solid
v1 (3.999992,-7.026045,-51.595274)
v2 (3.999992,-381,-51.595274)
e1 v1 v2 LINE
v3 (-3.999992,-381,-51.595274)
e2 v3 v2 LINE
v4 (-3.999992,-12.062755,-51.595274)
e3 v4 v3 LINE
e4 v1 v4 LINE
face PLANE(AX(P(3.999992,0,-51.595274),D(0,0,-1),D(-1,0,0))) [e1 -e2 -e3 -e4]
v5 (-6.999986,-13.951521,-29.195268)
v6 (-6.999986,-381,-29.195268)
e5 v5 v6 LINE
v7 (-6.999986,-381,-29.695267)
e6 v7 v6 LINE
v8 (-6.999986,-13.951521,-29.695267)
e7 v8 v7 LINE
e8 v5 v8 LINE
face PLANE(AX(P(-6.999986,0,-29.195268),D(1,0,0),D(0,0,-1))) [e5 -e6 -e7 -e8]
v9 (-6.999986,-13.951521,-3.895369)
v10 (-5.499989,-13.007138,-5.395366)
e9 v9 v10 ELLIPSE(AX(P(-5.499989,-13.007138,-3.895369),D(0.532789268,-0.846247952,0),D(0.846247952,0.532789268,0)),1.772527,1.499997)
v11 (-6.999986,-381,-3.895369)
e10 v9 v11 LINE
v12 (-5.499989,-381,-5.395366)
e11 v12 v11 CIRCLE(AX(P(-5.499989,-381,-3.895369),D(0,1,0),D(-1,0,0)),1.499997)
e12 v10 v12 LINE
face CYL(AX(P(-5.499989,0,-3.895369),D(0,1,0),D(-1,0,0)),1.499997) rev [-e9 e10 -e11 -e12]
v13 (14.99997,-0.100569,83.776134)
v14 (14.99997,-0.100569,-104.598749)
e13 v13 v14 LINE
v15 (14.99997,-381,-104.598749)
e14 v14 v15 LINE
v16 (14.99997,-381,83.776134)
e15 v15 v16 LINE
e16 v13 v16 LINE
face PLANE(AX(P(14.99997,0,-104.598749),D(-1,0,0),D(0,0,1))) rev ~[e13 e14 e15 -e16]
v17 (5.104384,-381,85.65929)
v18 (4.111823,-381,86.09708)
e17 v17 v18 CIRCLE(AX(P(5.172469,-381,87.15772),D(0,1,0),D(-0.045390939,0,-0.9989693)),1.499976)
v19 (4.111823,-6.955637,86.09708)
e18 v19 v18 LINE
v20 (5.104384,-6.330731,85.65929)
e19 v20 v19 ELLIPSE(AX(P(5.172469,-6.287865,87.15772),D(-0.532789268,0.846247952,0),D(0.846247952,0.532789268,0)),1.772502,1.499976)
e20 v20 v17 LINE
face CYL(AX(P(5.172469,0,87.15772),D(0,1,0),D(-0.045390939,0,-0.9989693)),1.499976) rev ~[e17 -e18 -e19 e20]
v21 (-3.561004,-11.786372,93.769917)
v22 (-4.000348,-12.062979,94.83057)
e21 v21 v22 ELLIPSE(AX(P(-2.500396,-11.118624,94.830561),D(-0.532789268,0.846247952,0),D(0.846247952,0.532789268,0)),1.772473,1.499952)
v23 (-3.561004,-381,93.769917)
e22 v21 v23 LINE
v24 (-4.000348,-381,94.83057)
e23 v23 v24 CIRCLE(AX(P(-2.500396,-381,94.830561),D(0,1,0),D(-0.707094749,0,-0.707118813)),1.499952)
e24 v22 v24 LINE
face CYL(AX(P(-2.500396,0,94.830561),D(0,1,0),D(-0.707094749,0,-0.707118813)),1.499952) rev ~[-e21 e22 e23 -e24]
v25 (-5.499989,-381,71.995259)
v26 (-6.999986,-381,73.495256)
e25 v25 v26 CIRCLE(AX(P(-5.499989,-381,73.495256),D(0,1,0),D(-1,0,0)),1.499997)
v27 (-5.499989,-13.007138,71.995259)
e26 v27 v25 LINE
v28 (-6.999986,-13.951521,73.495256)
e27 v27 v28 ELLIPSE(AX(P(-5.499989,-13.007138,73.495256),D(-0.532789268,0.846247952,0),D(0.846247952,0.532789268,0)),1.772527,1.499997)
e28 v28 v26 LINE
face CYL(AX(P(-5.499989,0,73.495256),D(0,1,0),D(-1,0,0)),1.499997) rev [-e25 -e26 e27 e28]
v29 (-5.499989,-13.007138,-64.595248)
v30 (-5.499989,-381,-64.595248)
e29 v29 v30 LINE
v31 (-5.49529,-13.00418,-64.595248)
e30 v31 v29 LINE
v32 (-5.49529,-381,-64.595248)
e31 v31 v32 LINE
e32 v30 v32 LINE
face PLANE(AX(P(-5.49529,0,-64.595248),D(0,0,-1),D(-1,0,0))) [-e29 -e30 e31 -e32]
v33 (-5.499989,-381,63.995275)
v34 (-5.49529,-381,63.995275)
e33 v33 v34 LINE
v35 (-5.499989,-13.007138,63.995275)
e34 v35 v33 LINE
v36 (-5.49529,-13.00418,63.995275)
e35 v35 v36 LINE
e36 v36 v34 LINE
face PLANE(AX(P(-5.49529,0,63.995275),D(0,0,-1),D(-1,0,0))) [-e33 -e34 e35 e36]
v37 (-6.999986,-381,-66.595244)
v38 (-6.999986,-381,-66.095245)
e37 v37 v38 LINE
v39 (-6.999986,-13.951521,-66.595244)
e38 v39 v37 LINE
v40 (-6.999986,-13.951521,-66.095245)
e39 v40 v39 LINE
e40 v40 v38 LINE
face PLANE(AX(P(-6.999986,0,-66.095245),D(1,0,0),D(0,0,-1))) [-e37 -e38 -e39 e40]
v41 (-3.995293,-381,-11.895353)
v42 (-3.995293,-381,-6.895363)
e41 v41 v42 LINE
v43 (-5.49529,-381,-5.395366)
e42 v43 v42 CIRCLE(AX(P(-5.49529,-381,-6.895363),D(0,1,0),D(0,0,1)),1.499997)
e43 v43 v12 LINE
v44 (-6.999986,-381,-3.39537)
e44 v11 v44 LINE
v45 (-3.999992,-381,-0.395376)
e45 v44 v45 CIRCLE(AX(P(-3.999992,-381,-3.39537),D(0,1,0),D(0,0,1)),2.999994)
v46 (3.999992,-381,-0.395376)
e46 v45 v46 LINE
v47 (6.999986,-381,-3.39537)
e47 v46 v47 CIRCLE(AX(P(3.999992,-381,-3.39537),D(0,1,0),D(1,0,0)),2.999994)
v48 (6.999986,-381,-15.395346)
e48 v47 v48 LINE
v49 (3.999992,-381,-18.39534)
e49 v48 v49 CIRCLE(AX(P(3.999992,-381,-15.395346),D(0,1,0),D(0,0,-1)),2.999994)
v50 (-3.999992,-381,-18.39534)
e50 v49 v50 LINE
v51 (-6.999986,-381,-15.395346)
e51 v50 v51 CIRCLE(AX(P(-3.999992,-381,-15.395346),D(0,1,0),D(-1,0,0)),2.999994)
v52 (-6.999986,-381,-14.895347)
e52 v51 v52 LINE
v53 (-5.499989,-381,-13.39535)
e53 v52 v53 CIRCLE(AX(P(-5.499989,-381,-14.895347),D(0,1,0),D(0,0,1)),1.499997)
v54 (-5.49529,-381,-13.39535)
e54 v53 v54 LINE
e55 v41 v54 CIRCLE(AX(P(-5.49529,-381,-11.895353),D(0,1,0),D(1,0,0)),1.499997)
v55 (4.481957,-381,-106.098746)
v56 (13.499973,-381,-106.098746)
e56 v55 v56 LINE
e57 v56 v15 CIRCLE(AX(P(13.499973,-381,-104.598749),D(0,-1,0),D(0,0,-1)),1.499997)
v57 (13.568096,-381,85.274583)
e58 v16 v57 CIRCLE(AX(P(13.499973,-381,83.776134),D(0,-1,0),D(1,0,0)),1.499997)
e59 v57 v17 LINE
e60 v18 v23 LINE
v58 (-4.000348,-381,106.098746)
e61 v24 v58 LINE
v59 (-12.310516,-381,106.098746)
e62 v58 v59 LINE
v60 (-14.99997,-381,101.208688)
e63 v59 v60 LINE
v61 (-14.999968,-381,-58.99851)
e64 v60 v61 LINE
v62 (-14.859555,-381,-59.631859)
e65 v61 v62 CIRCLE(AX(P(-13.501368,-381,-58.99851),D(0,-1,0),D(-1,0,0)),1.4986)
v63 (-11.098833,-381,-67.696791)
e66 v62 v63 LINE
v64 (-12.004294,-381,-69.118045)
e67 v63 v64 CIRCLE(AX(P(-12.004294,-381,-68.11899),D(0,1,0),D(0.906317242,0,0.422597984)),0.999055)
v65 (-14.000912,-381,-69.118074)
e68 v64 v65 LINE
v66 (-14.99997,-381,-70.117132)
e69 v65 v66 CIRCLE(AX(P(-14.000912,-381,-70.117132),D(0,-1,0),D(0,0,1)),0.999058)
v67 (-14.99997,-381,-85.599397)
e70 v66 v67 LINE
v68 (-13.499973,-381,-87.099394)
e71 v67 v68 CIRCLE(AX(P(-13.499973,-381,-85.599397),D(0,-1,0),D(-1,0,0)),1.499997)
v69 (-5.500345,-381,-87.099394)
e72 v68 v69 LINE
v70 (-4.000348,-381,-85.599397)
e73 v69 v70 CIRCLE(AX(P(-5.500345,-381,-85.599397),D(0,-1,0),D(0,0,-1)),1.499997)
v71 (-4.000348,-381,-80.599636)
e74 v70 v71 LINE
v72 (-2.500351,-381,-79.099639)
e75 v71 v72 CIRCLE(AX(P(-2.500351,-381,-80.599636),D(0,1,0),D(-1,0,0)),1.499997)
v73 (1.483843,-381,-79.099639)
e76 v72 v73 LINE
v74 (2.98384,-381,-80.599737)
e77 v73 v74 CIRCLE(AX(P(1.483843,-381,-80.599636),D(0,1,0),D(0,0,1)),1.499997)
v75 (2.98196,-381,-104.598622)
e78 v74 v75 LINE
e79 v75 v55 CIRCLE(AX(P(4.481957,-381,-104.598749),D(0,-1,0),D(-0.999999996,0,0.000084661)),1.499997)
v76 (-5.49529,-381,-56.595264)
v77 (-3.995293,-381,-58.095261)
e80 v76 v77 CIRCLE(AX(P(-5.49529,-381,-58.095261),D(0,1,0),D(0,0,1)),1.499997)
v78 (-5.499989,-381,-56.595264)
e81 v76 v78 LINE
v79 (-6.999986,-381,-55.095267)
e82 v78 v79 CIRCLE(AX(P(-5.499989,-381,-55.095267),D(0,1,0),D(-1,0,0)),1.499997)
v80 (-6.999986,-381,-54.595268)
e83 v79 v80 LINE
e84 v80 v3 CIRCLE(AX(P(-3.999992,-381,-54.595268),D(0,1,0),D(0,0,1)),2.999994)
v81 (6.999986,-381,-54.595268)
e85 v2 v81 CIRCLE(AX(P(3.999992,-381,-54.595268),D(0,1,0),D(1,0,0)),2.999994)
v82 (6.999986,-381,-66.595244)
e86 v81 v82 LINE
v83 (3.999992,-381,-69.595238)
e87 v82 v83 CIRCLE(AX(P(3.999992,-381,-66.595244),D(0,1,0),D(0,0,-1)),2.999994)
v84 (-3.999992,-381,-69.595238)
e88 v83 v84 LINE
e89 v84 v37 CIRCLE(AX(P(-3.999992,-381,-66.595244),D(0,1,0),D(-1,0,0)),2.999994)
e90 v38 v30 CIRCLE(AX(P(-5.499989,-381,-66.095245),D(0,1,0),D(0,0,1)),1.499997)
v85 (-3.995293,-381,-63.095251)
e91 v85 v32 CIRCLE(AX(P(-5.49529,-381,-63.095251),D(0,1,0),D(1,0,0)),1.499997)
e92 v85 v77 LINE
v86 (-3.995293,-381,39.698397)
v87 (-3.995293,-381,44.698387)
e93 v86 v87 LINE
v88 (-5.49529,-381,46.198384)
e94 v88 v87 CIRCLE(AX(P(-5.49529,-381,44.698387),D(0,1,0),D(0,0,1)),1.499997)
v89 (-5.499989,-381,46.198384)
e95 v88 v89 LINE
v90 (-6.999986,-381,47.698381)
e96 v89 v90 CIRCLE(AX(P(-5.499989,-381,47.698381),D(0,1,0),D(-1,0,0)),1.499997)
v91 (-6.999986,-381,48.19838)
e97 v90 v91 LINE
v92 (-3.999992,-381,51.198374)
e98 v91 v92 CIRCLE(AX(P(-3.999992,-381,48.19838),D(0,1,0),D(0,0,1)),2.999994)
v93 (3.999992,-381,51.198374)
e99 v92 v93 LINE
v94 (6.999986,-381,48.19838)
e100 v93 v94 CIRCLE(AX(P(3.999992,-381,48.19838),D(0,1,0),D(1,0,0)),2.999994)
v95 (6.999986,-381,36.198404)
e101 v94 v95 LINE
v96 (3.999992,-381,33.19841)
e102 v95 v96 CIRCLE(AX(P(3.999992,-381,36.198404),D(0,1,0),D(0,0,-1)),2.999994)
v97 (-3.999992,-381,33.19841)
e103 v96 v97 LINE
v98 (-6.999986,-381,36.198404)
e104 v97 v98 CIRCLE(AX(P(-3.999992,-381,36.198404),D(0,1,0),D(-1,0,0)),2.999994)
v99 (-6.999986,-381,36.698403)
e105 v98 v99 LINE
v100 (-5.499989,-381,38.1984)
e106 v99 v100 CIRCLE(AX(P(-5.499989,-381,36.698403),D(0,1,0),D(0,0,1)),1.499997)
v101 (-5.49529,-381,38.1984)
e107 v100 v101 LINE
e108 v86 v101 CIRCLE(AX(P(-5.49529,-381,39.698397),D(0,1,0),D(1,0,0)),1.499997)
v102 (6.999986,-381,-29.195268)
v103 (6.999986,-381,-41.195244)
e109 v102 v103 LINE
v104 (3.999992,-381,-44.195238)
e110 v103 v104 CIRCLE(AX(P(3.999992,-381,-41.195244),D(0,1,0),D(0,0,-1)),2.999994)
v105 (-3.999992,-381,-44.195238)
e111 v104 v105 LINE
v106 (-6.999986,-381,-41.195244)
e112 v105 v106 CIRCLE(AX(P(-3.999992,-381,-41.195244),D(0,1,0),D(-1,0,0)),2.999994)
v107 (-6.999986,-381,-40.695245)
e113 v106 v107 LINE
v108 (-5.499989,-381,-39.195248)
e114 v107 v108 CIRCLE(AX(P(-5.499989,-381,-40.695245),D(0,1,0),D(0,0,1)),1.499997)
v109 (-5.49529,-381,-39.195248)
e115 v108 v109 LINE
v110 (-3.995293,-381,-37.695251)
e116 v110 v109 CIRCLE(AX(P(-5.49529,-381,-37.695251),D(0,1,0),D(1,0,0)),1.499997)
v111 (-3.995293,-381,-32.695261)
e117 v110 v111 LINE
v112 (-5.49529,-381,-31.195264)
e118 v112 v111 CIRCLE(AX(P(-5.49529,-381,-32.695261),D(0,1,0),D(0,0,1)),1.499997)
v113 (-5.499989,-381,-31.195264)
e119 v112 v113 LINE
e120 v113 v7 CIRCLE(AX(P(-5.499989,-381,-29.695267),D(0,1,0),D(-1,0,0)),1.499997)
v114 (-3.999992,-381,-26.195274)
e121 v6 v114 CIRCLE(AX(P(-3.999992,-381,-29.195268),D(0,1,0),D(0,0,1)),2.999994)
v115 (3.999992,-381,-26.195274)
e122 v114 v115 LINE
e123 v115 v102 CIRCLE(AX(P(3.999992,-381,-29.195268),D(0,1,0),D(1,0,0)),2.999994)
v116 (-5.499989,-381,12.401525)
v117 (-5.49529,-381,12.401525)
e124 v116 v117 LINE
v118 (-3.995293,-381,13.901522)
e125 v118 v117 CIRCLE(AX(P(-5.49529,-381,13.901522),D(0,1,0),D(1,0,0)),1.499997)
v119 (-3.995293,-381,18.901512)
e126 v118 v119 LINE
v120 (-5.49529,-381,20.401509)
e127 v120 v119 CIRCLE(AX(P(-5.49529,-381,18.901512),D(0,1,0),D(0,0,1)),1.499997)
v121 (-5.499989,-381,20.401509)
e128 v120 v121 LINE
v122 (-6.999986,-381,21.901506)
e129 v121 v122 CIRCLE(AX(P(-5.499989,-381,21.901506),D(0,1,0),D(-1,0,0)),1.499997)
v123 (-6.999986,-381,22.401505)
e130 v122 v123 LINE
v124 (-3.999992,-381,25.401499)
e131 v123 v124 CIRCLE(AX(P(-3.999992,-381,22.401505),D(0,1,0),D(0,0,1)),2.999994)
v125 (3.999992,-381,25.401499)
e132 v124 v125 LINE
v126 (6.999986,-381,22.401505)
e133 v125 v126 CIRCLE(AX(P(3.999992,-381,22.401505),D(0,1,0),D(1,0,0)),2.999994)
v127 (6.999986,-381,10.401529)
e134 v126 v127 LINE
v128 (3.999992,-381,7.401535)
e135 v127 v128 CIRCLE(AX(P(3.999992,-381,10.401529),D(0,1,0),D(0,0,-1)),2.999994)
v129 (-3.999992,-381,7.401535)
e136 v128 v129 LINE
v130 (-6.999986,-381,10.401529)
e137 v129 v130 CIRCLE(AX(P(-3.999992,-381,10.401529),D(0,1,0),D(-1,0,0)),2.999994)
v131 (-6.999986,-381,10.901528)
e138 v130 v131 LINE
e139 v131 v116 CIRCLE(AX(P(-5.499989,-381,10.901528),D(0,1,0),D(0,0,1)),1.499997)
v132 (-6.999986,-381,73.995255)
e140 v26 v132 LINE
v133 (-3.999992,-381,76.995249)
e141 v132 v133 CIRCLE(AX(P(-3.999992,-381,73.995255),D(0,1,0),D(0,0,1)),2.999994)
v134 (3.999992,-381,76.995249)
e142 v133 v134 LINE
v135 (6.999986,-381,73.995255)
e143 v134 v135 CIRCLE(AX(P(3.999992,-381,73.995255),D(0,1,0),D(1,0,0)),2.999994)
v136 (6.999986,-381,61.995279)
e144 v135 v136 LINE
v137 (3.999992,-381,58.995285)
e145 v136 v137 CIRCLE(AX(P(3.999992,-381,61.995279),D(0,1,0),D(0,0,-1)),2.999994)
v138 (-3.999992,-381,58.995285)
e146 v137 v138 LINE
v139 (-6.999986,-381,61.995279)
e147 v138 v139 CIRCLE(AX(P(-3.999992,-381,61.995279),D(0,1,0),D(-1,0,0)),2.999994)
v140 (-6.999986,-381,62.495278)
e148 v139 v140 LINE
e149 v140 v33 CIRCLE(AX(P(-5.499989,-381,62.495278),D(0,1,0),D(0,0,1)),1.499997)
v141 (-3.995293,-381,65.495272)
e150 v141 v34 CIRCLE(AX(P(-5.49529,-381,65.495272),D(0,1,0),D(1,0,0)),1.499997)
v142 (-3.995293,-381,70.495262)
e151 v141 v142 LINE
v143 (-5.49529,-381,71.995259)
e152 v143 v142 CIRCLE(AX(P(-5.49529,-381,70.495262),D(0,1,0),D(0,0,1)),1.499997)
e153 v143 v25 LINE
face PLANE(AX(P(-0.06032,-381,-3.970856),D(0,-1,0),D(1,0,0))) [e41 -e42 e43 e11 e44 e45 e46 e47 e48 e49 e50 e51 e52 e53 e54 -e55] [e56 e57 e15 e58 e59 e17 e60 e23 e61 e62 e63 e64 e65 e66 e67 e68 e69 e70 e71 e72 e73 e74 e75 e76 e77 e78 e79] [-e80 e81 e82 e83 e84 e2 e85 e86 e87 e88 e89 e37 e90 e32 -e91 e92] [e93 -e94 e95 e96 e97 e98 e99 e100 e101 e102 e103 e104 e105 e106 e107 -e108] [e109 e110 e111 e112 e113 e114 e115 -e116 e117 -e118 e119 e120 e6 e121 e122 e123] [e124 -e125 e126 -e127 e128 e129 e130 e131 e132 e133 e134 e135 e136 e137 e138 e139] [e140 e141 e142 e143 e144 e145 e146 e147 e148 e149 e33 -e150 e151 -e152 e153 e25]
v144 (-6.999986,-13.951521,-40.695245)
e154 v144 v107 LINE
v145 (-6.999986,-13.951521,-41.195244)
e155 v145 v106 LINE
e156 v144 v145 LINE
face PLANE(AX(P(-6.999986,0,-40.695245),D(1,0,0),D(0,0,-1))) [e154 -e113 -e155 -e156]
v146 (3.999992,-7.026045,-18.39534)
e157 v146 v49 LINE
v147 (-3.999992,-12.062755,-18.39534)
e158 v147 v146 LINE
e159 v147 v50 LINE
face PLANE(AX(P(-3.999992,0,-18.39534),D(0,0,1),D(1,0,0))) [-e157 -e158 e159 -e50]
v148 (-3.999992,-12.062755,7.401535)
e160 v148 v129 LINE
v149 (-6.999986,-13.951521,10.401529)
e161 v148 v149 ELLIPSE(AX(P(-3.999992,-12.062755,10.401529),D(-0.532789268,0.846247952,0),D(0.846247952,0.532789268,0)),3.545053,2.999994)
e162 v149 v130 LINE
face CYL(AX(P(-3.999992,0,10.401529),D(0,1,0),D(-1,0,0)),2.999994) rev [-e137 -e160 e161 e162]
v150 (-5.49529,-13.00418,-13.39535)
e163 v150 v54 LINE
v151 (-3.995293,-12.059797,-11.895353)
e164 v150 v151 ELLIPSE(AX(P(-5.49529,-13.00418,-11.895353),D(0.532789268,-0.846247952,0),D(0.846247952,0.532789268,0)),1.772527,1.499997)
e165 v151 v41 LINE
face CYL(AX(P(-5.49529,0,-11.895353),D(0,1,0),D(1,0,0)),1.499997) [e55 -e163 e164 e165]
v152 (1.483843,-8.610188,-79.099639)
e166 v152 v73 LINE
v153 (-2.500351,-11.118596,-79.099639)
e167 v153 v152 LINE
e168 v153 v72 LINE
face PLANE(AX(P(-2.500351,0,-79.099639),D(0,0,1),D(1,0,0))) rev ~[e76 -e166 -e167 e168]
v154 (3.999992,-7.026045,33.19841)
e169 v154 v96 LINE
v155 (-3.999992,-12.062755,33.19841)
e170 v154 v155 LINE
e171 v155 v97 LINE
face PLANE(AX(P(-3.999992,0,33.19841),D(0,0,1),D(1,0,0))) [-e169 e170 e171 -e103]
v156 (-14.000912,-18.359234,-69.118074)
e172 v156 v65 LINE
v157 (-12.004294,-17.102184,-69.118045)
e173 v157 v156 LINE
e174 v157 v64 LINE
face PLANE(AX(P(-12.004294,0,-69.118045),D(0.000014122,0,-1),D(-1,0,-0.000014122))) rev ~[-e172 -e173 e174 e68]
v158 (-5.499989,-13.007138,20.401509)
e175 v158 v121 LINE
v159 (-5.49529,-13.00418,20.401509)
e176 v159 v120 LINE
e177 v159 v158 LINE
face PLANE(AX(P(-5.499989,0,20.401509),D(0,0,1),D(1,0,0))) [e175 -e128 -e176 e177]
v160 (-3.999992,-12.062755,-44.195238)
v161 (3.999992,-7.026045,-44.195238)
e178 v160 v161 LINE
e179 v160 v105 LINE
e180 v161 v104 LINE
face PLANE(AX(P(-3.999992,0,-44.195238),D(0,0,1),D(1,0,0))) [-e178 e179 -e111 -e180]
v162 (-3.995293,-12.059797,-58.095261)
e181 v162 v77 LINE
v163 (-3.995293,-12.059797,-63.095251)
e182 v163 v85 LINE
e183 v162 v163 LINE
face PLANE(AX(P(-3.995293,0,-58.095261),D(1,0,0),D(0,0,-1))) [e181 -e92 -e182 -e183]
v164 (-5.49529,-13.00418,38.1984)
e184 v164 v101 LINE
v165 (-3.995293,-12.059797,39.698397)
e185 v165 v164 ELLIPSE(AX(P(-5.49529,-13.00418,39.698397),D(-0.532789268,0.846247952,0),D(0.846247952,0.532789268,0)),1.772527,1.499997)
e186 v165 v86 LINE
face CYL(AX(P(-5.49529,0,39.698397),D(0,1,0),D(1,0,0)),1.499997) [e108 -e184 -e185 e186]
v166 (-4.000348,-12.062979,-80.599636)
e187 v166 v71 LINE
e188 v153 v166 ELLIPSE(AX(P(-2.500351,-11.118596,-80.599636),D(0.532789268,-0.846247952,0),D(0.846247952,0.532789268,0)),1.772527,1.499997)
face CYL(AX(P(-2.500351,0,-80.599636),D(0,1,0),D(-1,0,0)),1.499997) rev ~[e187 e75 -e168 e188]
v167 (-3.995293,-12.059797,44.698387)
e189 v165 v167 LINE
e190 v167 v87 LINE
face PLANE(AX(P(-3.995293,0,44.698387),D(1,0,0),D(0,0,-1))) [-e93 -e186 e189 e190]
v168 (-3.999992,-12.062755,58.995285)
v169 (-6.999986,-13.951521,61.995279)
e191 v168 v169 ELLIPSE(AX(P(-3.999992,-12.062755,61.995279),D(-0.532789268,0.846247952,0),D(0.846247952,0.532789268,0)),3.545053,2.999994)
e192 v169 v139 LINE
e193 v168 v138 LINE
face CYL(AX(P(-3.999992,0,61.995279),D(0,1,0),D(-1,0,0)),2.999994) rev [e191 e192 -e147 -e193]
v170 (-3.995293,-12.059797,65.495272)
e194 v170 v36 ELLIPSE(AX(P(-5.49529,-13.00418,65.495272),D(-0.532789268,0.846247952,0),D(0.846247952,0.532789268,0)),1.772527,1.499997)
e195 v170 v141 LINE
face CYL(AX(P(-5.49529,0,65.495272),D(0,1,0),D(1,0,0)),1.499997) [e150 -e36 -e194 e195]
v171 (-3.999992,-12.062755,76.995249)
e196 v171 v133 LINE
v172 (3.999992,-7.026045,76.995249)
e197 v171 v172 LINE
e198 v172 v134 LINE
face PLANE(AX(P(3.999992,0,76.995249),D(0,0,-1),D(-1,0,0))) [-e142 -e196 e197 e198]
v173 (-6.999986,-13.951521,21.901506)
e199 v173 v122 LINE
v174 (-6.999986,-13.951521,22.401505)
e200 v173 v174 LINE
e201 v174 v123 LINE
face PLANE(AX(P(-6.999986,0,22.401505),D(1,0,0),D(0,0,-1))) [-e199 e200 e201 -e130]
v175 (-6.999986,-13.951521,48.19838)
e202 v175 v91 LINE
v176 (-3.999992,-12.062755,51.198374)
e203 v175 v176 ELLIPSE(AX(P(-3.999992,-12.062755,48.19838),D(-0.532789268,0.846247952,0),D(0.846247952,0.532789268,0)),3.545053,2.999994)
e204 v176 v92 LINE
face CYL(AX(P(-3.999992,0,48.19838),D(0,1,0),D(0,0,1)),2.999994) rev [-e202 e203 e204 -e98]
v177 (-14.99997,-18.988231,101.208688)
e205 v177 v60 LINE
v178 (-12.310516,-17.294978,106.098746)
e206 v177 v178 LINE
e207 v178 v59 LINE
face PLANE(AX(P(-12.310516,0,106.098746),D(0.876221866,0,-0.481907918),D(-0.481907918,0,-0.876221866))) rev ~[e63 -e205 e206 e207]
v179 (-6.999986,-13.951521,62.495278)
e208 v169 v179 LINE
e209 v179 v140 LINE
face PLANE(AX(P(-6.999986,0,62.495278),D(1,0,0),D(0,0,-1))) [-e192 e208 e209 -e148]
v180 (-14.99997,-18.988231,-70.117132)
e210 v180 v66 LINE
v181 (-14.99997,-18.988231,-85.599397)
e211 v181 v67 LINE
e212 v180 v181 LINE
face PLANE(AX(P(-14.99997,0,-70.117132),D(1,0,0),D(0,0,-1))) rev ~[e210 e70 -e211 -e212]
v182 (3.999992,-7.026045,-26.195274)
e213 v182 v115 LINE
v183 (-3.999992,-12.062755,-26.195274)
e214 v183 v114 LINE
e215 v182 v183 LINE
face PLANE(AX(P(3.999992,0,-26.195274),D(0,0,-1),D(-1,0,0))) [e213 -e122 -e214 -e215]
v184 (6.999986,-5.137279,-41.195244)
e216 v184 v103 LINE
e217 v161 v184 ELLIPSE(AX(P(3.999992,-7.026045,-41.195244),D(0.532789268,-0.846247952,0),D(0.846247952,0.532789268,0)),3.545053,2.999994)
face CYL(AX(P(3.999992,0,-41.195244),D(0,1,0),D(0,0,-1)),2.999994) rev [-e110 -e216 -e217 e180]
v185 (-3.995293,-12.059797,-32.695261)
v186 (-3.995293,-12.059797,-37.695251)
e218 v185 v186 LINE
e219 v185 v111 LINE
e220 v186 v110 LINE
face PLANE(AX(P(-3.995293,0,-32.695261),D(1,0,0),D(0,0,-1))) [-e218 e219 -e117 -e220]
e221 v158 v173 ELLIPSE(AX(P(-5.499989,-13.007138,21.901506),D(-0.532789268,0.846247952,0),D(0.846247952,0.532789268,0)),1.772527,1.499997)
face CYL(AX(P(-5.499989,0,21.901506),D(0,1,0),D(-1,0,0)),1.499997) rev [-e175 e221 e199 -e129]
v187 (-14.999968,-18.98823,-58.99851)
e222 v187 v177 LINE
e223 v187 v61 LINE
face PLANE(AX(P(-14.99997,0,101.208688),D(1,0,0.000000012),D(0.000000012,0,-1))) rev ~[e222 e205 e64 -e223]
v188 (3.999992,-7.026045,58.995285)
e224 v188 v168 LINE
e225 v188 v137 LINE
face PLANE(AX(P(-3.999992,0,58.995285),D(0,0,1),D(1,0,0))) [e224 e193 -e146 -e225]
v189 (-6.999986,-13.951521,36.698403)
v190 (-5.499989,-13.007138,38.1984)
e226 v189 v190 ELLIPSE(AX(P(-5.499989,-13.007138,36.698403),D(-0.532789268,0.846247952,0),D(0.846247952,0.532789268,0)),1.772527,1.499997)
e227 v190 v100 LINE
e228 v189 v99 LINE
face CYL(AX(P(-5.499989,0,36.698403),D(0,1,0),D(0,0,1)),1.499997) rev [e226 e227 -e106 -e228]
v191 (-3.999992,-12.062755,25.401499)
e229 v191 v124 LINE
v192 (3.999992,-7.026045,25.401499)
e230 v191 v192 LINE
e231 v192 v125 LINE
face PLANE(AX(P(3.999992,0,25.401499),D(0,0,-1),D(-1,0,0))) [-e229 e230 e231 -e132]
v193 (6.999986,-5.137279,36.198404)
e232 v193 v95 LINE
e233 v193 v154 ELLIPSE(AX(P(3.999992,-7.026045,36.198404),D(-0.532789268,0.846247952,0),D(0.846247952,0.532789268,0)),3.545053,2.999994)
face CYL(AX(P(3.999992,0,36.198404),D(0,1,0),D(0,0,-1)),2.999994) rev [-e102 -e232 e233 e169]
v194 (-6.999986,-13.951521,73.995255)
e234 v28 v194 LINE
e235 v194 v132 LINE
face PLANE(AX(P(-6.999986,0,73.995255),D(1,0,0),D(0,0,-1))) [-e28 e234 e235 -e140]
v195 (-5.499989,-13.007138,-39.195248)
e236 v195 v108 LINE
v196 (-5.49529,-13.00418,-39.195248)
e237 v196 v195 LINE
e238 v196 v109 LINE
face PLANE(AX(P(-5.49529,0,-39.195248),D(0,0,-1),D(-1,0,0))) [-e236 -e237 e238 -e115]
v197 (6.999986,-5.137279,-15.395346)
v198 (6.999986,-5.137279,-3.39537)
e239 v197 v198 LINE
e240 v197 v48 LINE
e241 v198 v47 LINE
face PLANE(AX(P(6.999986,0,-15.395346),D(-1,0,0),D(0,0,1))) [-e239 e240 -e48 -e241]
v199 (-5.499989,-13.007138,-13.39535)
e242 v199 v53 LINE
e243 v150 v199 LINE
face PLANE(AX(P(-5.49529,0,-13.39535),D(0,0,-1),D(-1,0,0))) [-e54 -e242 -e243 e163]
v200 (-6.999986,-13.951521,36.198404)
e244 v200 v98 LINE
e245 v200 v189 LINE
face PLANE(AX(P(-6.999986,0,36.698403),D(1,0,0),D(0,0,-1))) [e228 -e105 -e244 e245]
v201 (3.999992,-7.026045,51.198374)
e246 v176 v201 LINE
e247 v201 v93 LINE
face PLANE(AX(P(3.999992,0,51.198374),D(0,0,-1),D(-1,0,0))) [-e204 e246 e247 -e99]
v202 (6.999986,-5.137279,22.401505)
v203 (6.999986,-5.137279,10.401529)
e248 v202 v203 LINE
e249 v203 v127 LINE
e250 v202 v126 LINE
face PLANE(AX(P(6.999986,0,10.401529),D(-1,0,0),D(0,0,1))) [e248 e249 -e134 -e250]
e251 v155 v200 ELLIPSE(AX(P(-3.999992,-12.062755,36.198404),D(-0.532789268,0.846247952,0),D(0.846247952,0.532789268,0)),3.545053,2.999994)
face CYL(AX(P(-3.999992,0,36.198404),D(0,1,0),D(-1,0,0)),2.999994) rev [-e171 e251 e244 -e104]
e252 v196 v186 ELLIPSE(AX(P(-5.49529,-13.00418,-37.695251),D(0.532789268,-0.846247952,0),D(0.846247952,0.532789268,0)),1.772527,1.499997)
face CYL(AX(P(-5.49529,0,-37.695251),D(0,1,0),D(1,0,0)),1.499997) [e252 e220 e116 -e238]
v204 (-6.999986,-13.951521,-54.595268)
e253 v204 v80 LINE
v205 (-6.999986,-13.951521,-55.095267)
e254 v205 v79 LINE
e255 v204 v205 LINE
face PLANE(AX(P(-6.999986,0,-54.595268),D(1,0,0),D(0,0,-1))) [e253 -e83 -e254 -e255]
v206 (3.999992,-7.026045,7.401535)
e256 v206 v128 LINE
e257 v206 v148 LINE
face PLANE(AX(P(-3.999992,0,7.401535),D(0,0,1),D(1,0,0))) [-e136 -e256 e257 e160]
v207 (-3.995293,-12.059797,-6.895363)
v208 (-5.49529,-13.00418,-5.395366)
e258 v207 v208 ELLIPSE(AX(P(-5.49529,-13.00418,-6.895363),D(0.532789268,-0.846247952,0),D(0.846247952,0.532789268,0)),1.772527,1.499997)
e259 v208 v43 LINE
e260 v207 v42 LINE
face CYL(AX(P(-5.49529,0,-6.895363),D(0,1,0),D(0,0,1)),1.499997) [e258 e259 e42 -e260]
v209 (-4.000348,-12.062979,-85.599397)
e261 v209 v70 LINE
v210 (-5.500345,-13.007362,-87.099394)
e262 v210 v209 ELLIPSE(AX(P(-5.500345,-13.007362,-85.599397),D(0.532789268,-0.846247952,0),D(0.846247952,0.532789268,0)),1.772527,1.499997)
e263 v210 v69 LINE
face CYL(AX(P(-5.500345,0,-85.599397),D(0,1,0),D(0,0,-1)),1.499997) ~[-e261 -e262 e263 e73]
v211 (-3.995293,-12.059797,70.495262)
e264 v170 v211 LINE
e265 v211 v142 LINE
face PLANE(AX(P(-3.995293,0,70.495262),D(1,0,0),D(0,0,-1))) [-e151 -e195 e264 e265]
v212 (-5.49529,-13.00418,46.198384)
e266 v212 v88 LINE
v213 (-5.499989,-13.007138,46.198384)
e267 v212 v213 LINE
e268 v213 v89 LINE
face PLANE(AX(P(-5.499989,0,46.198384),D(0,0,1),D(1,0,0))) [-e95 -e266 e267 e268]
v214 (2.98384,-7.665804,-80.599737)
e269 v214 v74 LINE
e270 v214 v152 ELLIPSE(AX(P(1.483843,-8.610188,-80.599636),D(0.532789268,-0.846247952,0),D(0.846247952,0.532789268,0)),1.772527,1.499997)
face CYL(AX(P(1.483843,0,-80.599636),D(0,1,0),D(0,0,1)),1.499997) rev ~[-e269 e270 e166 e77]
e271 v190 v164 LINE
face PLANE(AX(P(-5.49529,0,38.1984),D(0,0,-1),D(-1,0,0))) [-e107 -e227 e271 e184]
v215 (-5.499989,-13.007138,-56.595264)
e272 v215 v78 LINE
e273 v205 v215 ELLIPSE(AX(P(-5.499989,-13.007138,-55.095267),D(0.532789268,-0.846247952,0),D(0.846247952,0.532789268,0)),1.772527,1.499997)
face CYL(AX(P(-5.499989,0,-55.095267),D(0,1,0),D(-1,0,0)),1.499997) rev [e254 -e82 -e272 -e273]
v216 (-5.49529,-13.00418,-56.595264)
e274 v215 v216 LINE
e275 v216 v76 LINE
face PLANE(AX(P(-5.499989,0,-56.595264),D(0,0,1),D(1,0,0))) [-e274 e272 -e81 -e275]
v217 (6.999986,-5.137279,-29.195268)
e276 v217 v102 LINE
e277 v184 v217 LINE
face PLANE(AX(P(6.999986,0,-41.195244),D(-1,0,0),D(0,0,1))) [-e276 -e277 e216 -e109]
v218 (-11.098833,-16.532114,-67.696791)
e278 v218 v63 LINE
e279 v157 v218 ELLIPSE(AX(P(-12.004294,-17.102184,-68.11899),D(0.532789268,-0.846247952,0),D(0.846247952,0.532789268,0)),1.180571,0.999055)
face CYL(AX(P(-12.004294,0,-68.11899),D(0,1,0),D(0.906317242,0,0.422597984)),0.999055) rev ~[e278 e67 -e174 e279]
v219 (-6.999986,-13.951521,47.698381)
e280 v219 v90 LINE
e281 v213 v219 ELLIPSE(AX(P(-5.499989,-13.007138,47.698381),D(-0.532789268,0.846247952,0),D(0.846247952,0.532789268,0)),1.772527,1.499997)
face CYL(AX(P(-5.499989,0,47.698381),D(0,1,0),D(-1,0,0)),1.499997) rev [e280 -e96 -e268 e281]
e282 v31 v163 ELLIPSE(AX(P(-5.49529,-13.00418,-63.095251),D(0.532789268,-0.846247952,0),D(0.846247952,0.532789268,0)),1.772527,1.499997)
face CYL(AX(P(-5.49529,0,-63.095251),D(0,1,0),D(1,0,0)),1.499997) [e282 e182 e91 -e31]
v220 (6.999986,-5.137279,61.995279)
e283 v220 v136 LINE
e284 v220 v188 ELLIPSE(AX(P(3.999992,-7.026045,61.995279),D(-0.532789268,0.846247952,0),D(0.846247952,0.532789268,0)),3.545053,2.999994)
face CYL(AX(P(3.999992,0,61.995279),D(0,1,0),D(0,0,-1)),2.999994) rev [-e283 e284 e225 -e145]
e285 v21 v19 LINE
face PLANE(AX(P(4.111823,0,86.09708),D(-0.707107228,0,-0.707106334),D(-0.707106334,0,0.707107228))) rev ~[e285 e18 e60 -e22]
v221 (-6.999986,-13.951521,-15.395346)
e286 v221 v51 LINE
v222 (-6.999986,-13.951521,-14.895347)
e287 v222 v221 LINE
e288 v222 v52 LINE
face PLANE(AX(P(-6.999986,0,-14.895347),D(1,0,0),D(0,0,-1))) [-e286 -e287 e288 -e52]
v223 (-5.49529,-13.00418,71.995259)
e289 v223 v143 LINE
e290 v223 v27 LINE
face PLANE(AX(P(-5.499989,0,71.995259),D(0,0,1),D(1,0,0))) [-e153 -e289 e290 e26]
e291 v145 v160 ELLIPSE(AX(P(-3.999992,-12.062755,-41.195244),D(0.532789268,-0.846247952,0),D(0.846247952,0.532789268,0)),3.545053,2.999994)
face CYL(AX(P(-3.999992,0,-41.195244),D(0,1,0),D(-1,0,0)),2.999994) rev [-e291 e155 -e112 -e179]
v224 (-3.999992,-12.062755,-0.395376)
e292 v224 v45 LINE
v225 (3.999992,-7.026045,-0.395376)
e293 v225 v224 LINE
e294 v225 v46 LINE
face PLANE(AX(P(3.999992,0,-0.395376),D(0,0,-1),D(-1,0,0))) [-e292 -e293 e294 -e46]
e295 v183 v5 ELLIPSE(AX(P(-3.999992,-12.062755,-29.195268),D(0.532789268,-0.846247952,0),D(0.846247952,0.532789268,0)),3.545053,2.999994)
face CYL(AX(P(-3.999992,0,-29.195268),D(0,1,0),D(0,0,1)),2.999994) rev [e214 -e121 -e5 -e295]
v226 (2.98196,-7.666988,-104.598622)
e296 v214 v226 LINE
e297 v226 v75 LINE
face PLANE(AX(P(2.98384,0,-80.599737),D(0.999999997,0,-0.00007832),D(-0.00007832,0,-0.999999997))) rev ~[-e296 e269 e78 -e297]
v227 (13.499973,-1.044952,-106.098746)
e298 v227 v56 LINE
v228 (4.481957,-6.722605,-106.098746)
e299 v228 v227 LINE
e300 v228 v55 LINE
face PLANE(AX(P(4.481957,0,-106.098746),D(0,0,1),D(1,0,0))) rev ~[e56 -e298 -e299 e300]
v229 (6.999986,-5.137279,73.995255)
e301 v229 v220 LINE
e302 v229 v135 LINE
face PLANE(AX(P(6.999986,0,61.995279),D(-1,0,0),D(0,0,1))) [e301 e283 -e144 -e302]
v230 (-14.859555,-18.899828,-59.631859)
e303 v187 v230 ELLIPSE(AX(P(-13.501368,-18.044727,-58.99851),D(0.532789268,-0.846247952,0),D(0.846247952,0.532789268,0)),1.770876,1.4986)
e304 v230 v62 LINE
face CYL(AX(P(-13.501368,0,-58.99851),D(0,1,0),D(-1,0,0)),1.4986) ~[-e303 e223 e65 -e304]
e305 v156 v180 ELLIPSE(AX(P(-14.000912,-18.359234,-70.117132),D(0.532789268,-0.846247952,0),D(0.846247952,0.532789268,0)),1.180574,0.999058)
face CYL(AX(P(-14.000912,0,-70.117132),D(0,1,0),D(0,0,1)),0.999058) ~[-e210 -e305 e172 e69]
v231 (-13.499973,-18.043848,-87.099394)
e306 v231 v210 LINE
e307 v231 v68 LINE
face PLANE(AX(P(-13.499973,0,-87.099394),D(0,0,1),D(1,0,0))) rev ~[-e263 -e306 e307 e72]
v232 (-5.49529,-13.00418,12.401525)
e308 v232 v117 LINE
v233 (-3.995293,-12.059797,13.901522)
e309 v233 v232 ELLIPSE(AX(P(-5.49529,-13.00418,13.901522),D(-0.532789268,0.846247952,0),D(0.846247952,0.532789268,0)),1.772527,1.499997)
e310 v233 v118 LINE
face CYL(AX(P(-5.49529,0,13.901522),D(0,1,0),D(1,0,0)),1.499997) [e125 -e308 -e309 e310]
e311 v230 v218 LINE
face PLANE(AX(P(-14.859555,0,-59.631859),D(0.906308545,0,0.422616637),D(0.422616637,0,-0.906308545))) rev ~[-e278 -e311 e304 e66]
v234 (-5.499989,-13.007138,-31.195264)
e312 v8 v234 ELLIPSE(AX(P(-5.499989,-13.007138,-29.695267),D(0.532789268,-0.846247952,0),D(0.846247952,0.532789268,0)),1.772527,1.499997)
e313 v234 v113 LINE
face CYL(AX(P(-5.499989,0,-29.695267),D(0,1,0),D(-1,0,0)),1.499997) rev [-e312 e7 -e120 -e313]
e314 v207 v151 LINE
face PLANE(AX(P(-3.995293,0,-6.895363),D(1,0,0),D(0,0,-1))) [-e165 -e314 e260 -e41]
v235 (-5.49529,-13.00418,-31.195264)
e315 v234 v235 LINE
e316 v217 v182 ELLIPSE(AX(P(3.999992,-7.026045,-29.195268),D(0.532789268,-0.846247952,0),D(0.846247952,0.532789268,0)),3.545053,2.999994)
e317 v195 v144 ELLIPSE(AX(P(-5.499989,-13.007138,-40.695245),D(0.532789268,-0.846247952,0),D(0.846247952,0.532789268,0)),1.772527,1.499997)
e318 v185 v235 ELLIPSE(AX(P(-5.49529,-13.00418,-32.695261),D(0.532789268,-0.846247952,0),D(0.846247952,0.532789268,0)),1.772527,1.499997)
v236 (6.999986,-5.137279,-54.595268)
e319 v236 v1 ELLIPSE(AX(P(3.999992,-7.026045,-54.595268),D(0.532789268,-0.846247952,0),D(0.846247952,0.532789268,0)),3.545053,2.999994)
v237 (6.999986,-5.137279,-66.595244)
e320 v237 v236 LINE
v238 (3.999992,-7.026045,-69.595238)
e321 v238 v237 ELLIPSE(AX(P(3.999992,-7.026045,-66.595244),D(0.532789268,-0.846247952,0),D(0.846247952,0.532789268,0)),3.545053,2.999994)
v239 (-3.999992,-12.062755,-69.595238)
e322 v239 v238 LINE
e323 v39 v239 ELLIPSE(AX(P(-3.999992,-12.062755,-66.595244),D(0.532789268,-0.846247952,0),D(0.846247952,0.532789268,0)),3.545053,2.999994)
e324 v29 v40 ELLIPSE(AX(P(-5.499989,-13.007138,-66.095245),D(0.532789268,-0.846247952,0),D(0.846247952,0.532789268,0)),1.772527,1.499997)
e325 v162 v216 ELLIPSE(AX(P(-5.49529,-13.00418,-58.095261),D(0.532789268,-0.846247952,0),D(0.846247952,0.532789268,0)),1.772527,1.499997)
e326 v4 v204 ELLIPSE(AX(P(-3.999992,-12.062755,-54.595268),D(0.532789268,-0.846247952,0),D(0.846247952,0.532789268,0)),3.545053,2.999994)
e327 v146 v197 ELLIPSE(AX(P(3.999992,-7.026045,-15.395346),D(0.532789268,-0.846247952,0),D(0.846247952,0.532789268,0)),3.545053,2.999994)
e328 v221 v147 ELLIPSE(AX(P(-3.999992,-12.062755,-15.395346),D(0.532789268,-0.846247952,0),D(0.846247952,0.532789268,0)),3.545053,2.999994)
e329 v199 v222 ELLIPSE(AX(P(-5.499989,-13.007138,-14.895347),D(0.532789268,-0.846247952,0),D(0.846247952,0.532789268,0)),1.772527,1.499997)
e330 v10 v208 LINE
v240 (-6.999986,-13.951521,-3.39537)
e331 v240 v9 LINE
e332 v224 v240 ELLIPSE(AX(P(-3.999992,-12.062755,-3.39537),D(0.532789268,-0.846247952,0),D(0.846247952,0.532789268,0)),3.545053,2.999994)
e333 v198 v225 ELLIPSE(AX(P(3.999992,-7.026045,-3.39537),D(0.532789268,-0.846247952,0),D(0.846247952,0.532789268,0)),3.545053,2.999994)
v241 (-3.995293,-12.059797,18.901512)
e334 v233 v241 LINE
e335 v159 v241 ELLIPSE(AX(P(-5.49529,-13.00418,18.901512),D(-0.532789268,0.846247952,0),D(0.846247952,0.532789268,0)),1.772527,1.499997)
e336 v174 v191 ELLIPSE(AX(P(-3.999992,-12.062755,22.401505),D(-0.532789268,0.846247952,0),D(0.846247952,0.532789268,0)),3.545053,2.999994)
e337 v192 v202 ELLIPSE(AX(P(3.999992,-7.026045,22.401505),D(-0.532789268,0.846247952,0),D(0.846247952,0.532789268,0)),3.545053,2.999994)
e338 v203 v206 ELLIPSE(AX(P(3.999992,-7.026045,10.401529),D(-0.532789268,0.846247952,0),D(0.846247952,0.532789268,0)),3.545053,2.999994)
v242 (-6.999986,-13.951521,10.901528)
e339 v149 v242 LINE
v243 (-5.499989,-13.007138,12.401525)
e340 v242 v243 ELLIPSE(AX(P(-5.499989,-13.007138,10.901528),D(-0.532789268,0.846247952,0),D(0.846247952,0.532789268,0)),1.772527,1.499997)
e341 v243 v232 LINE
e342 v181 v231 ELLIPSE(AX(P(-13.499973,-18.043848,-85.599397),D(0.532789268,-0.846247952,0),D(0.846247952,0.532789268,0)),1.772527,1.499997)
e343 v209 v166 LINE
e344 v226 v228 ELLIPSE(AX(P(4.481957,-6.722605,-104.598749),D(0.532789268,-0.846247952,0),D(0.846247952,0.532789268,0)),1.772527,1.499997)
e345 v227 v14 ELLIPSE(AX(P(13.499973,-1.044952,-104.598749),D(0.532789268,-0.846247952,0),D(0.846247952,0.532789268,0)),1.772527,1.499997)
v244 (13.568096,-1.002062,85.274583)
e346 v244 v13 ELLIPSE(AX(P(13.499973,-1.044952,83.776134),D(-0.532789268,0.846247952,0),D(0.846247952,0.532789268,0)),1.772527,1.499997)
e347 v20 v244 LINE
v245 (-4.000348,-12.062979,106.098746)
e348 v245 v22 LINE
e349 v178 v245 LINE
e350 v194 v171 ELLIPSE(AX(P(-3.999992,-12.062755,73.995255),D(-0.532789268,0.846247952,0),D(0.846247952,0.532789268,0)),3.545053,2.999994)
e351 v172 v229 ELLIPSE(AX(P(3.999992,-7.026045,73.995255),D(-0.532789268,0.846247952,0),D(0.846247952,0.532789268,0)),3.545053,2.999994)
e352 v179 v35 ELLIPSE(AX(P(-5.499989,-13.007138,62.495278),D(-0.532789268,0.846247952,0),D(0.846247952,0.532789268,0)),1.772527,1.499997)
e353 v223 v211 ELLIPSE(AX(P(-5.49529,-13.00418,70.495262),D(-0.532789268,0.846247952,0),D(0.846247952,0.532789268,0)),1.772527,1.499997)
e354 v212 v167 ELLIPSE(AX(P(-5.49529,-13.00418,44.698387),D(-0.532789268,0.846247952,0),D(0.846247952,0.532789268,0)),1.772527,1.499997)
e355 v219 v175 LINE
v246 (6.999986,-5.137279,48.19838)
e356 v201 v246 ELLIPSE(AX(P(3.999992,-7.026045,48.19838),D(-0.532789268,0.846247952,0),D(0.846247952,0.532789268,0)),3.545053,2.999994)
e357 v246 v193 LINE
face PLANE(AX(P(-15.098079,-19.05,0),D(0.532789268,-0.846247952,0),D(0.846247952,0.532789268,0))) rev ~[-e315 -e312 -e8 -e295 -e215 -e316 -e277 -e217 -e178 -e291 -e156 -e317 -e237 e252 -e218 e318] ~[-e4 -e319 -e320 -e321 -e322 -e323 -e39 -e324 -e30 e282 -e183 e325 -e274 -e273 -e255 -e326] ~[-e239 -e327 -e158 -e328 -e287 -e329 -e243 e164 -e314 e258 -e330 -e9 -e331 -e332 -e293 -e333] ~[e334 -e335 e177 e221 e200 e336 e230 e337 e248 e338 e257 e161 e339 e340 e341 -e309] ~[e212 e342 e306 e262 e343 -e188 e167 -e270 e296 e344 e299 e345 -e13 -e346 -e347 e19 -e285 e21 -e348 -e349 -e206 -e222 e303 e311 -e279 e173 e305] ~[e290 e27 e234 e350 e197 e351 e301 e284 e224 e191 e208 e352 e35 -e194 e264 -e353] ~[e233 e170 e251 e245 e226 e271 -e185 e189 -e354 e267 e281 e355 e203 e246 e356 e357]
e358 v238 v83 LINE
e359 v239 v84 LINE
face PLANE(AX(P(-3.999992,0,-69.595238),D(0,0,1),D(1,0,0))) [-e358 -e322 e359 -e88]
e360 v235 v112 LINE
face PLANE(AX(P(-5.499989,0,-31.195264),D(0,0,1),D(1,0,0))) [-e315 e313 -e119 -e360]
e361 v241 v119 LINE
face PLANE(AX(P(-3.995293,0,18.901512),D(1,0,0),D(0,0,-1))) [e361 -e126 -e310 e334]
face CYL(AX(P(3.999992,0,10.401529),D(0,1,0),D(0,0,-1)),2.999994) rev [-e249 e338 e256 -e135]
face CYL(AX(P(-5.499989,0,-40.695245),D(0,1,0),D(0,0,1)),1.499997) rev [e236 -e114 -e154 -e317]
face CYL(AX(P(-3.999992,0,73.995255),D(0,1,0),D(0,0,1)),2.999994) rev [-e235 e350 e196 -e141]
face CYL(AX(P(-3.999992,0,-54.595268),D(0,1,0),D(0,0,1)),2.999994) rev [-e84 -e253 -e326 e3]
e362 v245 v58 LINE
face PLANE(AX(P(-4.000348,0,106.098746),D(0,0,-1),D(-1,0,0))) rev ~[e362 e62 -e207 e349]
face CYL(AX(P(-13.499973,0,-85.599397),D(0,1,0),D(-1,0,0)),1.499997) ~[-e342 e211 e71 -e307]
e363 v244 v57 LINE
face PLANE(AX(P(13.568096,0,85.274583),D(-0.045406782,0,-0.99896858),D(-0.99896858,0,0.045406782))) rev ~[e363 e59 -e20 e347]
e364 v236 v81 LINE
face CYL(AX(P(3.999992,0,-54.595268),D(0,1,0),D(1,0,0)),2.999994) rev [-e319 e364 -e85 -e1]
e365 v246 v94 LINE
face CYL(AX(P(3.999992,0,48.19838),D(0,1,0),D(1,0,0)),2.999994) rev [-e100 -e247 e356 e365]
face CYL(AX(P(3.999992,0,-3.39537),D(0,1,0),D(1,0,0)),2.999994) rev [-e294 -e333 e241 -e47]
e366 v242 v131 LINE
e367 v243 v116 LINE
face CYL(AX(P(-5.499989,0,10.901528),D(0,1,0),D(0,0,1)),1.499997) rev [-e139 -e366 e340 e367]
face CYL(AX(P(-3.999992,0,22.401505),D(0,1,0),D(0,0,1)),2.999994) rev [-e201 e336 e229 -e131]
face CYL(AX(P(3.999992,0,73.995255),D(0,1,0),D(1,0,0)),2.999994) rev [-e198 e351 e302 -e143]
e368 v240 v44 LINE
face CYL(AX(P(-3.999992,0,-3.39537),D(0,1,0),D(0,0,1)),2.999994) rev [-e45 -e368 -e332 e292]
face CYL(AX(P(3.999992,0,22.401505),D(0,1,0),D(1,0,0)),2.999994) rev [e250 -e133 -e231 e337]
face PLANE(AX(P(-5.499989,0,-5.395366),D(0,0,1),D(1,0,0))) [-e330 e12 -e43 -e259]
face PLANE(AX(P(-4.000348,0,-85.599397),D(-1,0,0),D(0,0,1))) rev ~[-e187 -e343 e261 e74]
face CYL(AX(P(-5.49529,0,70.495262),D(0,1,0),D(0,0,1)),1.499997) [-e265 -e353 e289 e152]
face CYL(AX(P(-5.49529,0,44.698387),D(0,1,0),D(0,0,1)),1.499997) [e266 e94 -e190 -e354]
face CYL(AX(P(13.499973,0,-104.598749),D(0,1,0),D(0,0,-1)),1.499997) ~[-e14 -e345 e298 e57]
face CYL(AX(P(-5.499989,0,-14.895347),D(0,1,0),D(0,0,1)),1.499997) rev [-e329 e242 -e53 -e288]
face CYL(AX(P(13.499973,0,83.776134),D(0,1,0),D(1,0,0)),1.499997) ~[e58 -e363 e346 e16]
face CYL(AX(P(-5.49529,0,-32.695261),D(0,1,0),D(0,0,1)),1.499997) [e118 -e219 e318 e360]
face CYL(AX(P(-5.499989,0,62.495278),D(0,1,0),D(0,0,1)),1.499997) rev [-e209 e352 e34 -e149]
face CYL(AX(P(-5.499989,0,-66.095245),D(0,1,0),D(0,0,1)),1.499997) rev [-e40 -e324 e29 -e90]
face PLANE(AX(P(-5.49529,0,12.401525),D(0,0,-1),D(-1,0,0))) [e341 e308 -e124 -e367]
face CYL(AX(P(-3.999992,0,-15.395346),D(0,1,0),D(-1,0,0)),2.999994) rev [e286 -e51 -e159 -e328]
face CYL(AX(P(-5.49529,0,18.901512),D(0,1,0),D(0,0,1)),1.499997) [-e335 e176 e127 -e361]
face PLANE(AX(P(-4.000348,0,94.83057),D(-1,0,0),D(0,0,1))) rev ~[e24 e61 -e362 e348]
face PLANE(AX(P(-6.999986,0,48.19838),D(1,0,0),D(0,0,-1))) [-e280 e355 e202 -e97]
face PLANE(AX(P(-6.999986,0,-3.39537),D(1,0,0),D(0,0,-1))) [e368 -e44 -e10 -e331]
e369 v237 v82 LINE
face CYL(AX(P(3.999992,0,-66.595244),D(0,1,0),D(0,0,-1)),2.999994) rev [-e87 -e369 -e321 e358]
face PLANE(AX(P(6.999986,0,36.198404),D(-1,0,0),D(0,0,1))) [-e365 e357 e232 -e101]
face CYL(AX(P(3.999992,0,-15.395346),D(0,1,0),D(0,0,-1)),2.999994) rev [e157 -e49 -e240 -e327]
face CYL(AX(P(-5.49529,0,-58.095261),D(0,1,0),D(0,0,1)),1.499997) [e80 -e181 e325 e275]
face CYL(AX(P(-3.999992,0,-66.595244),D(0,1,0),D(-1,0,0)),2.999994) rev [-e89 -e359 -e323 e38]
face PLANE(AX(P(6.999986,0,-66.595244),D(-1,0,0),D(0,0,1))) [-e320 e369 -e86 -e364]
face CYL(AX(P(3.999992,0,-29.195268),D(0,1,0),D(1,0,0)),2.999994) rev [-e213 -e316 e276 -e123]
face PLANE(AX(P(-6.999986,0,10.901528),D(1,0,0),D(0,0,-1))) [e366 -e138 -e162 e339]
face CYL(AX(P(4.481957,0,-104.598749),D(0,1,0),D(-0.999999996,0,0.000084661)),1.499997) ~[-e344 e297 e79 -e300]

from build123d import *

# Parameters (mm, degrees)
F1_DEPTH      = 381
F3_DEPTH      = 711.2
F5_DEPTH      = 106.0997464
F5_DEPTH_BACK = 106.0997464


# Not quite as in the source:
# - ends of sketch curves that miss each other by under 0.0002 mm in the source are joined


with BuildPart() as f1:
    # F0 (on Front) → F1 (new body)
    with BuildSketch(Plane.XZ):
        with BuildLine():
            ThreePointArc((-14.9999680608, -58.9985104), (-14.96444377, -59.322873513), (-14.8595551032, -59.6318585804))
            Line((-14.8595551032, -59.6318585804), (-11.0988328608, -67.6967912))
            ThreePointArc((-11.0988328608, -67.6967912), (-11.1617050028, -68.655791158), (-12.004294, -69.1180454046))
            Line((-12.004294, -69.1180454046), (-14.0009118, -69.1180736))
            ThreePointArc((-14.0009118, -69.1180736), (-14.707352628, -69.410690972), (-14.99997, -70.1171318))
            Line((-14.99997, -70.1171318), (-14.99997, -85.599397))
            ThreePointArc((-14.99997, -85.599397), (-14.5606310505, -86.6600550505), (-13.499973, -87.099394))
            Line((-13.499973, -87.099394), (-5.5003446, -87.099394))
            ThreePointArc((-5.5003446, -87.099394), (-4.4396865495, -86.6600550505), (-4.0003476, -85.599397))
            Line((-4.0003476, -85.599397), (-4.0003476, -80.5996356))
            ThreePointArc((-4.0003476, -80.5996356), (-3.5610086505, -79.5389775495), (-2.5003506, -79.0996386))
            Line((-2.5003506, -79.0996386), (1.4838426, -79.0996386))
            ThreePointArc((1.4838426, -79.0996386), (2.5445365709, -79.5390134712), (2.9838395966, -80.5997372))
            Line((2.9838395966, -80.5997372), (2.98196, -104.5986224))
            ThreePointArc((2.98196, -104.5986224), (3.4212540492, -105.6593625482), (4.481957, -106.0987464))
            Line((4.481957, -106.0987464), (13.499973, -106.0987464))
            ThreePointArc((13.499973, -106.0987464), (14.5606310505, -105.6594074505), (14.99997, -104.5987494))
            Line((14.99997, -104.5987494), (14.99997, 83.7761342))
            ThreePointArc((14.99997, 83.7761342), (14.5844487053, 84.8124273268), (13.5680958768, 85.2745834897))
            Line((13.5680958768, 85.2745834897), (5.104384, 85.6592902))
            ThreePointArc((5.104384, 85.6592902), (4.5671403109, 85.7853117853), (4.1118233495, 86.0970797495))
            Line((4.1118233495, 86.0970797495), (-3.5610038, 93.7699166))
            ThreePointArc((-3.5610038, 93.7699166), (-3.8861671271, 94.2565457995), (-4.0003476, 94.8305698))
            Line((-4.0003476, 94.8305698), (-4.0003476, 106.0987464))
            Line((-4.0003476, 106.0987464), (-12.3105164, 106.0987464))
            Line((-12.3105164, 106.0987464), (-14.99997, 101.2086876))
            Line((-14.99997, 101.2086876), (-14.9999680608, -58.9985104))
        make_face()
    extrude(amount=F1_DEPTH)

    # F2 (on Front) → F3 (cut)
    with BuildSketch(Plane.XZ):
        with BuildLine():
            ThreePointArc((-5.49529, -31.195264), (-4.4346319495, -31.6346029495), (-3.995293, -32.695261))
            Line((-3.995293, -32.695261), (-3.995293, -37.695251))
            ThreePointArc((-3.995293, -37.695251), (-4.4346319495, -38.7559090505), (-5.49529, -39.195248))
            Line((-5.49529, -39.195248), (-5.499989, -39.195248))
            ThreePointArc((-5.499989, -39.195248), (-6.5606470505, -39.6345869495), (-6.999986, -40.695245))
            Line((-6.999986, -40.695245), (-6.999986, -41.195244))
            ThreePointArc((-6.999986, -41.195244), (-6.1213081009, -43.3165601009), (-3.999992, -44.195238))
            Line((-3.999992, -44.195238), (3.999992, -44.195238))
            ThreePointArc((3.999992, -44.195238), (6.1213081009, -43.3165601009), (6.999986, -41.195244))
            Line((6.999986, -41.195244), (6.999986, -29.195268))
            ThreePointArc((6.999986, -29.195268), (6.1213081009, -27.0739518991), (3.999992, -26.195274))
            Line((3.999992, -26.195274), (-3.999992, -26.195274))
            ThreePointArc((-3.999992, -26.195274), (-6.1213081009, -27.0739518991), (-6.999986, -29.195268))
            Line((-6.999986, -29.195268), (-6.999986, -29.695267))
            ThreePointArc((-6.999986, -29.695267), (-6.5606470505, -30.7559250505), (-5.499989, -31.195264))
            Line((-5.499989, -31.195264), (-5.49529, -31.195264))
        make_face()
        with BuildLine():
            ThreePointArc((-5.49529, -56.595264), (-4.4346319495, -57.0346029495), (-3.995293, -58.095261))
            Line((-3.995293, -58.095261), (-3.995293, -63.095251))
            ThreePointArc((-3.995293, -63.095251), (-4.4346319495, -64.1559090505), (-5.49529, -64.595248))
            Line((-5.49529, -64.595248), (-5.499989, -64.595248))
            ThreePointArc((-5.499989, -64.595248), (-6.5606470505, -65.0345869495), (-6.999986, -66.095245))
            Line((-6.999986, -66.095245), (-6.999986, -66.595244))
            ThreePointArc((-6.999986, -66.595244), (-6.1213081009, -68.7165601009), (-3.999992, -69.595238))
            Line((-3.999992, -69.595238), (0, -69.595238))
            Line((0, -69.595238), (3.999992, -69.595238))
            ThreePointArc((3.999992, -69.595238), (6.1213081009, -68.7165601009), (6.999986, -66.595244))
            Line((6.999986, -66.595244), (6.999986, -54.595268))
            ThreePointArc((6.999986, -54.595268), (6.1213081009, -52.4739518991), (3.999992, -51.595274))
            Line((3.999992, -51.595274), (-3.999992, -51.595274))
            ThreePointArc((-3.999992, -51.595274), (-6.1213081009, -52.4739518991), (-6.999986, -54.595268))
            Line((-6.999986, -54.595268), (-6.999986, -55.095267))
            ThreePointArc((-6.999986, -55.095267), (-6.5606470505, -56.1559250505), (-5.499989, -56.595264))
            Line((-5.499989, -56.595264), (-5.49529, -56.595264))
        make_face()
        with BuildLine():
            ThreePointArc((-5.49529, -5.3953664), (-4.4346319495, -5.8347053495), (-3.995293, -6.8953634))
            Line((-3.995293, -6.8953634), (-3.995293, -11.8953534))
            ThreePointArc((-3.995293, -11.8953534), (-4.4346319495, -12.9560114505), (-5.49529, -13.3953504))
            Line((-5.49529, -13.3953504), (-5.499989, -13.3953504))
            ThreePointArc((-5.499989, -13.3953504), (-6.5606470505, -13.8346893495), (-6.999986, -14.8953474))
            Line((-6.999986, -14.8953474), (-6.999986, -15.3953464))
            ThreePointArc((-6.999986, -15.3953464), (-6.1213081009, -17.5166625009), (-3.999992, -18.3953404))
            Line((-3.999992, -18.3953404), (3.999992, -18.3953404))
            ThreePointArc((3.999992, -18.3953404), (6.1213081009, -17.5166625009), (6.999986, -15.3953464))
            Line((6.999986, -15.3953464), (6.999986, -3.3953704))
            ThreePointArc((6.999986, -3.3953704), (6.1213081009, -1.2740542991), (3.999992, -0.3953764))
            Line((3.999992, -0.3953764), (-3.999992, -0.3953764))
            ThreePointArc((-3.999992, -0.3953764), (-6.1213081009, -1.2740542991), (-6.999986, -3.3953704))
            Line((-6.999986, -3.3953704), (-6.999986, -3.8953694))
            ThreePointArc((-6.999986, -3.8953694), (-6.5606470505, -4.9560274505), (-5.499989, -5.3953664))
            Line((-5.499989, -5.3953664), (-5.49529, -5.3953664))
        make_face()
        with BuildLine():
            Line((-5.499989, 20.4015086), (-5.49529, 20.4015086))
            ThreePointArc((-5.49529, 20.4015086), (-4.4346319495, 19.9621696505), (-3.995293, 18.9015116))
            Line((-3.995293, 18.9015116), (-3.995293, 13.9015216))
            ThreePointArc((-3.995293, 13.9015216), (-4.4346319495, 12.8408635495), (-5.49529, 12.4015246))
            Line((-5.49529, 12.4015246), (-5.499989, 12.4015246))
            ThreePointArc((-5.499989, 12.4015246), (-6.5606470505, 11.9621856505), (-6.999986, 10.9015276))
            Line((-6.999986, 10.9015276), (-6.999986, 10.4015286))
            ThreePointArc((-6.999986, 10.4015286), (-6.1213081009, 8.2802124991), (-3.999992, 7.4015346))
            Line((-3.999992, 7.4015346), (3.999992, 7.4015346))
            ThreePointArc((3.999992, 7.4015346), (6.1213081009, 8.2802124991), (6.999986, 10.4015286))
            Line((6.999986, 10.4015286), (6.999986, 22.4015046))
            ThreePointArc((6.999986, 22.4015046), (6.1213081009, 24.5228207009), (3.999992, 25.4014986))
            Line((3.999992, 25.4014986), (-3.999992, 25.4014986))
            ThreePointArc((-3.999992, 25.4014986), (-6.1213081009, 24.5228207009), (-6.999986, 22.4015046))
            Line((-6.999986, 22.4015046), (-6.999986, 21.9015056))
            ThreePointArc((-6.999986, 21.9015056), (-6.5606470505, 20.8408475495), (-5.499989, 20.4015086))
        make_face()
        with BuildLine():
            Line((-5.499989, 46.1983836), (-5.49529, 46.1983836))
            ThreePointArc((-5.49529, 46.1983836), (-4.4346319495, 45.7590446505), (-3.995293, 44.6983866))
            Line((-3.995293, 44.6983866), (-3.995293, 39.6983966))
            ThreePointArc((-3.995293, 39.6983966), (-4.4346319495, 38.6377385495), (-5.49529, 38.1983996))
            Line((-5.49529, 38.1983996), (-5.499989, 38.1983996))
            ThreePointArc((-5.499989, 38.1983996), (-6.5606470505, 37.7590606505), (-6.999986, 36.6984026))
            Line((-6.999986, 36.6984026), (-6.999986, 36.1984036))
            ThreePointArc((-6.999986, 36.1984036), (-6.1213081009, 34.0770874991), (-3.999992, 33.1984096))
            Line((-3.999992, 33.1984096), (3.999992, 33.1984096))
            ThreePointArc((3.999992, 33.1984096), (6.1213081009, 34.0770874991), (6.999986, 36.1984036))
            Line((6.999986, 36.1984036), (6.999986, 48.1983796))
            ThreePointArc((6.999986, 48.1983796), (6.1213081009, 50.3196957009), (3.999992, 51.1983736))
            Line((3.999992, 51.1983736), (-3.999992, 51.1983736))
            ThreePointArc((-3.999992, 51.1983736), (-6.1213081009, 50.3196957009), (-6.999986, 48.1983796))
            Line((-6.999986, 48.1983796), (-6.999986, 47.6983806))
            ThreePointArc((-6.999986, 47.6983806), (-6.5606470505, 46.6377225495), (-5.499989, 46.1983836))
        make_face()
        with BuildLine():
            Line((-5.499989, 71.9952586), (-5.49529, 71.9952586))
            ThreePointArc((-5.49529, 71.9952586), (-4.4346319495, 71.5559196505), (-3.995293, 70.4952616))
            Line((-3.995293, 70.4952616), (-3.995293, 65.4952716))
            ThreePointArc((-3.995293, 65.4952716), (-4.4346319495, 64.4346135495), (-5.49529, 63.9952746))
            Line((-5.49529, 63.9952746), (-5.499989, 63.9952746))
            ThreePointArc((-5.499989, 63.9952746), (-6.5606470505, 63.5559356505), (-6.999986, 62.4952776))
            Line((-6.999986, 62.4952776), (-6.999986, 61.9952786))
            ThreePointArc((-6.999986, 61.9952786), (-6.1213081009, 59.8739624991), (-3.999992, 58.9952846))
            Line((-3.999992, 58.9952846), (3.999992, 58.9952846))
            ThreePointArc((3.999992, 58.9952846), (6.1213081009, 59.8739624991), (6.999986, 61.9952786))
            Line((6.999986, 61.9952786), (6.999986, 73.9952546))
            ThreePointArc((6.999986, 73.9952546), (6.1213081009, 76.1165707009), (3.999992, 76.9952486))
            Line((3.999992, 76.9952486), (-3.999992, 76.9952486))
            ThreePointArc((-3.999992, 76.9952486), (-6.1213081009, 76.1165707009), (-6.999986, 73.9952546))
            Line((-6.999986, 73.9952546), (-6.999986, 73.4952556))
            ThreePointArc((-6.999986, 73.4952556), (-6.5606470505, 72.4345975495), (-5.499989, 71.9952586))
        make_face()
    extrude(amount=F3_DEPTH, mode=Mode.SUBTRACT)

    # F4 (on Top) → F5 (cut, two sides)
    with BuildSketch(Plane.XY) as f5_sk:
        Polygon((15.1597065851, 0), (-15.0980791077, 0), (-15.0980791077, -19.05), align=None)
    extrude(amount=-F5_DEPTH, mode=Mode.SUBTRACT)
    extrude(f5_sk.sketch, amount=F5_DEPTH_BACK, mode=Mode.SUBTRACT)


solid = f1.part
